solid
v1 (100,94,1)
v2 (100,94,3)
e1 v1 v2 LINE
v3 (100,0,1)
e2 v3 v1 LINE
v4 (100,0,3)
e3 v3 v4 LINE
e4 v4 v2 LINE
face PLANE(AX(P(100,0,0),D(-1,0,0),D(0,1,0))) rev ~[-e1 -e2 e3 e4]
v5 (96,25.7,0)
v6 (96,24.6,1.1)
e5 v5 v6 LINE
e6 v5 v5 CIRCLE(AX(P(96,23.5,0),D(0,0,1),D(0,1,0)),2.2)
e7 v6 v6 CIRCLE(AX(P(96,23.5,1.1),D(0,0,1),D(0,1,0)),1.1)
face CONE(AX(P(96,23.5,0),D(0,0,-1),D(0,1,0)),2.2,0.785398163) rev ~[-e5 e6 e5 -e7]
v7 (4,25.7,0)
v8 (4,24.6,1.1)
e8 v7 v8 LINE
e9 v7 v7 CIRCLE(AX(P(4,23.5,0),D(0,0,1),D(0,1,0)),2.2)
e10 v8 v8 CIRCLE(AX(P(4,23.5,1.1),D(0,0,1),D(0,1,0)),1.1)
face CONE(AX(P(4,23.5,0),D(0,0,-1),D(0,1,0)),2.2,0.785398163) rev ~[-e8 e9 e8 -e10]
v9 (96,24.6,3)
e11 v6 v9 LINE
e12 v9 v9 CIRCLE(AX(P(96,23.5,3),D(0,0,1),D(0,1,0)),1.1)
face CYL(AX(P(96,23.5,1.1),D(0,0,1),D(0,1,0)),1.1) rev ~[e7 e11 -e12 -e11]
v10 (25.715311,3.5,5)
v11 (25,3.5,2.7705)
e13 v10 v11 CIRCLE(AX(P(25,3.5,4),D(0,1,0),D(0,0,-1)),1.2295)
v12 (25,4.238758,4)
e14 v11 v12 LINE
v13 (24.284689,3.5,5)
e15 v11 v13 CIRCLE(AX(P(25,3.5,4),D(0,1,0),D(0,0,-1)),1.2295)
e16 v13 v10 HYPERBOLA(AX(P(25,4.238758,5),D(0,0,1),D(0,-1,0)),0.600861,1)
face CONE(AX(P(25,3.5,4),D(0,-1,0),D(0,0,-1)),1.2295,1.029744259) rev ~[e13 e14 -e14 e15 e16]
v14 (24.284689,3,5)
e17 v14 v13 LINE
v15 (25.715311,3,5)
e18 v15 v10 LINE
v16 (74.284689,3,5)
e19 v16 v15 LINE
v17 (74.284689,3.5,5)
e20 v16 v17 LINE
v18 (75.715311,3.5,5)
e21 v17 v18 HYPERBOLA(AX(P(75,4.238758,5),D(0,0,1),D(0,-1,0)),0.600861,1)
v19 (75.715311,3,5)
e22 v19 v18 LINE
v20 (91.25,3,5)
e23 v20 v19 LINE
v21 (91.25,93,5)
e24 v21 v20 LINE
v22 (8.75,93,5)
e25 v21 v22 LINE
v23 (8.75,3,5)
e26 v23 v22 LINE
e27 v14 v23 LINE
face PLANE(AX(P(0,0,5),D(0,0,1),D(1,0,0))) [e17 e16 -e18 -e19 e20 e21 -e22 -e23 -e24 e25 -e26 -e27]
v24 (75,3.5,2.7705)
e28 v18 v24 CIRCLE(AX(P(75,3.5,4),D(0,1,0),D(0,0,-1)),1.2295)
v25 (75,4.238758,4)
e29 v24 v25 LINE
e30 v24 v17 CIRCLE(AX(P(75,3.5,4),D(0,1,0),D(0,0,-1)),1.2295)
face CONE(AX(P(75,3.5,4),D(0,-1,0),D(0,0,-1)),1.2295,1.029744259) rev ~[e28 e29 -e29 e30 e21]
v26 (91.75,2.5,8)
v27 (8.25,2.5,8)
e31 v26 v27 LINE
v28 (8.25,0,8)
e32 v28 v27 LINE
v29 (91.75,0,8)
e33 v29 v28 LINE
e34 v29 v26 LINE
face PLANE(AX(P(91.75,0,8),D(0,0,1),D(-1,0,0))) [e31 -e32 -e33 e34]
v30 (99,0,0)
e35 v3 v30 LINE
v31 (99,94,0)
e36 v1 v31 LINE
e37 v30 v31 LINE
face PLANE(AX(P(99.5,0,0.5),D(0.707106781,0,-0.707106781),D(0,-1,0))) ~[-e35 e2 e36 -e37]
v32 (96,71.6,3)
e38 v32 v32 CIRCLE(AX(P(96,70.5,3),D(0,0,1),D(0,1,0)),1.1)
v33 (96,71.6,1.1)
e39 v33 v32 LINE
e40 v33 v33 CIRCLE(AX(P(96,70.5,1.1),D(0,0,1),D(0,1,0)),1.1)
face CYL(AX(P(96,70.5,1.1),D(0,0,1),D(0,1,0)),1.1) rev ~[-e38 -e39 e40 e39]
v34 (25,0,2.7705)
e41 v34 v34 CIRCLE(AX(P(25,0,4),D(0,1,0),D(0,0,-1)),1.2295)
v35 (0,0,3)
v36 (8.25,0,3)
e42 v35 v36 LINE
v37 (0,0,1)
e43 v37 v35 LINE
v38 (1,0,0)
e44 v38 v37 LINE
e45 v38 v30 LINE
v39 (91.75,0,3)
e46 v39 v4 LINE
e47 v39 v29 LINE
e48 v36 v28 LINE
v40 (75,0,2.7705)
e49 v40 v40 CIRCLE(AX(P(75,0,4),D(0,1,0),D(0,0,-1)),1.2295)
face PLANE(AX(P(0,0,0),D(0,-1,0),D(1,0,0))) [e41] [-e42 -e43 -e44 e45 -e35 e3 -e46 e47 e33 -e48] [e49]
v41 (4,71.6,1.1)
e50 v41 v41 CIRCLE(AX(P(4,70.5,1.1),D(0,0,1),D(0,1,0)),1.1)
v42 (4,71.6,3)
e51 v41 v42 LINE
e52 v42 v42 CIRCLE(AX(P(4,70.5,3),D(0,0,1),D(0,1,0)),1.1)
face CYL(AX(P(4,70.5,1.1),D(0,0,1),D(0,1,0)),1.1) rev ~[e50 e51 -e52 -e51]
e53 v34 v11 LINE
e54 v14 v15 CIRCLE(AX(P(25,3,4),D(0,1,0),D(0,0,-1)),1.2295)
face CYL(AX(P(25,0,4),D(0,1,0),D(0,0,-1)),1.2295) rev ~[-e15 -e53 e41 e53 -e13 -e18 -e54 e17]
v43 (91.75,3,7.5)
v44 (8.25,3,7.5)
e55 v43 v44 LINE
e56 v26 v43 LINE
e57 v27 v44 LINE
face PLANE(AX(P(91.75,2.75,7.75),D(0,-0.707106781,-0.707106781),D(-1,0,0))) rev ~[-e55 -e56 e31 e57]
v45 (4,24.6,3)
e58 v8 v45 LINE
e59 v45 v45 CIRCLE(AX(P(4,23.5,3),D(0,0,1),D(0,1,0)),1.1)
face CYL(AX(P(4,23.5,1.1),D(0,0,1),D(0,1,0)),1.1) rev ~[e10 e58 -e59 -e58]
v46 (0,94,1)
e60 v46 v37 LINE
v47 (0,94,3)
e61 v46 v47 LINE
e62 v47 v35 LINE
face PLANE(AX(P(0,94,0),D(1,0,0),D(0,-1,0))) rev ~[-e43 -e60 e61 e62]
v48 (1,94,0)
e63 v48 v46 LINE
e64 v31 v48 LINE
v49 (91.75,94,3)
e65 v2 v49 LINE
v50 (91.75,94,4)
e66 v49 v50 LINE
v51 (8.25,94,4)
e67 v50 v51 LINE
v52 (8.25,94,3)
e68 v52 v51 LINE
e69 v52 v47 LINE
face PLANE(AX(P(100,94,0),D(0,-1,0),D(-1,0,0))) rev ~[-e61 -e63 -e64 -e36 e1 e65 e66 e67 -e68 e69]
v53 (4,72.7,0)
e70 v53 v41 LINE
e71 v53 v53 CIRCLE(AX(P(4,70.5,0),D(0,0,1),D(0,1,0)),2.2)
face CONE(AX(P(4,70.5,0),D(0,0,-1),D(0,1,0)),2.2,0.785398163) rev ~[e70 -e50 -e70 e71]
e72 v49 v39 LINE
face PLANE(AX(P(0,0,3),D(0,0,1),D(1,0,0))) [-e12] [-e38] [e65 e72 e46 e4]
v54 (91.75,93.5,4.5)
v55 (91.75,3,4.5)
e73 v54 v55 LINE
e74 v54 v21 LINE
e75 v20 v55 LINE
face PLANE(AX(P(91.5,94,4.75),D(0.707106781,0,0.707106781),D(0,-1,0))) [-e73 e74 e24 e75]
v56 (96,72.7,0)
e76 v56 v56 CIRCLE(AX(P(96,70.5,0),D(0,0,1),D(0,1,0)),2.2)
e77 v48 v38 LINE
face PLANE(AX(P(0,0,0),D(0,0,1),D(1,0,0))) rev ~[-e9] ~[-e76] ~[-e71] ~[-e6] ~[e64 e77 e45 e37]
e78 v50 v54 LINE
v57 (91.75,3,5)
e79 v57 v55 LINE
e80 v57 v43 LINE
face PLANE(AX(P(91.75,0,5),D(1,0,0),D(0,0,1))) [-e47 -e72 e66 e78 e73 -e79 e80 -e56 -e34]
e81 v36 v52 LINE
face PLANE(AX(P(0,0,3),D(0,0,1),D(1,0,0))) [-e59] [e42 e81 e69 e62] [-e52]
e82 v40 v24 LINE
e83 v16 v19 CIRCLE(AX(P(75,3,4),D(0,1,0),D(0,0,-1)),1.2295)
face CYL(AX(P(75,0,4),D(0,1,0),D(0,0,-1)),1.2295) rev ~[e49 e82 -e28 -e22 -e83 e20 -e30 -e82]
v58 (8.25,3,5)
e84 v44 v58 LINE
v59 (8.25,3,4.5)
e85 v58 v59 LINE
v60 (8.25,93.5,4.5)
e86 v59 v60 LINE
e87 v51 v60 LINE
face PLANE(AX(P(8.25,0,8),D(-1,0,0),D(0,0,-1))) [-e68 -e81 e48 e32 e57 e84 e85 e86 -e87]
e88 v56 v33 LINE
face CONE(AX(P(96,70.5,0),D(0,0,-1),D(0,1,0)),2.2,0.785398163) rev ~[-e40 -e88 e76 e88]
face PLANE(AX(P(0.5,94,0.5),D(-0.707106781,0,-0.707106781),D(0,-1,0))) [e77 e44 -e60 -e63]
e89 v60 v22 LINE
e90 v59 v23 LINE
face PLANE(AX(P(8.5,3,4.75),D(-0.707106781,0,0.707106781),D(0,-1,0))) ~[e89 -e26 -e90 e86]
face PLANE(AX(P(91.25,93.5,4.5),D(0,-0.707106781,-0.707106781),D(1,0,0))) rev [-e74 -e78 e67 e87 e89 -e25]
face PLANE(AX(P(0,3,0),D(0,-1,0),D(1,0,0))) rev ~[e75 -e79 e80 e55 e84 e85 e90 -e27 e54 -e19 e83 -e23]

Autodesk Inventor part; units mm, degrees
ref_plane "YZ Plane" through (0, 0, 0) normal (1, 0, 0) x (0, 1, 0)
ref_plane "XZ Plane" through (0, 0, 0) normal (0, 1, 0) x (-1, 0, 0)
ref_plane "XY Plane" through (0, 0, 0) normal (0, 0, 1) x (1, 0, 0)
sketch "Sketch1" plane through (0, 0, 0) normal (0, 0, 1) x (1, 0, 0)
  line L0 (0, 0) -> (100, 0)
  line L1 (100, 0) -> (100, 94)
  line L2 (100, 94) -> (0, 94)
  line L3 (0, 94) -> (0, 0)
  dimension "d0" = 100
  dimension "d1" = 94
extrude "Extrusion1" add sketch "Sketch1" along normal blind 3
sketch "Sketch2" plane through (0, 0, 3) normal (0, 0, 1) x (1, 0, 0)
  line L0 (100, 94) -> (0, 94) projected
  line L1 (8.25, 94) -> (91.75, 94)
  line L2 (91.75, 94) -> (91.75, 0)
  line L3 (91.75, 0) -> (8.25, 0)
  line L4 (8.25, 0) -> (8.25, 94)
  line L5 (100, 0) -> (100, 94) construction
  line L6 (100, 94) -> (92, 94) construction
  line L7 (92, 94) -> (92, 0) construction
  line L8 (92, 0) -> (100, 0) construction
  line L9 (100, 0) -> (100, 94) construction
  line L10 (0, 94) -> (8, 94) construction
  line L11 (8, 94) -> (8, 0) construction
  line L12 (8, 0) -> (0, 0) construction
  line L13 (0, 0) -> (0, 94) construction
  line L14 (0, 0) -> (100, 0) construction
  dimension "d4" = 8
  dimension "d5" = 0.25
  dimension "d6" = 0.25
extrude "Extrusion2" add sketch "Sketch2" along normal blind 2
sketch "Sketch4" plane through (0, 0, 0) normal (0, -1, 0) x (1, 0, 0)
  line L0 (91.75, 5) -> (8.25, 5) projected
  line L1 (8.25, 5) -> (91.75, 5)
  line L2 (91.75, 5) -> (91.75, 8)
  line L3 (91.75, 8) -> (8.25, 8)
  line L4 (8.25, 8) -> (8.25, 5)
  line L5 (91.75, 3) -> (91.75, 5) projected
  line L6 (0, 0) -> (100, 0) projected
  dimension "d10" = 8
extrude "Extrusion3" add sketch "Sketch4" against normal blind 3
sketch "Sketch6" plane through (0, 0, 0) normal (0, -1, 0) x (1, 0, 0)
  line L0 (0, 0) -> (100, 0) projected
  line L1 (91.75, 8) -> (8.25, 8) projected
  line L2 (100, 0) -> (100, 3) projected
  point P0 (25, 4)
  point P1 (75, 4)
  dimension "d20" = 8
  dimension "d21" = 4
  dimension "d22" = 100
  dimension "d23" = 25
  dimension "d24" = 50
hole "Hole1" at (25, 0, 4) at (75, 0, 4) direction (0, 1, 0) diameter 2.459 depth 3.5 tip angle 118 thread size "M3x0.5" class "6H" standard "ANSI Metric M Profile"
sketch "Sketch7" plane through (0, 0, 0) normal (0, 0, -1) x (-1, 0, 0)
  line L0 (-91.75, 94) -> (-91.75, 0) projected
  line L1 (-8.25, 0) -> (-8.25, 94) projected
  line L2 (-100, 0) -> (-100, 94) projected
  line L3 (0, 94) -> (0, 0) projected
  line L4 (-100, 94) -> (0, 94) projected
  point P0 (-96, 70.5)
  point P1 (-4, 70.5)
  point P2 (-96, 23.5)
  point P3 (-4, 23.5)
  dimension "d32" = 8.25
  dimension "d33" = 4
  dimension "d34" = 4
  dimension "d35" = 94
  dimension "d36" = 23.5
  dimension "d39" = 47
hole "Hole2" at (96, 70.5, 0) at (4, 70.5, 0) at (96, 23.5, 0) at (4, 23.5, 0) direction (0, 0, 1) diameter 2.2 depth 3.5 tip angle 118 countersink diameter 4.4 countersink angle 90 clearance for "Flat Head Machine Screw" size "M2" standard "Ansi Metric M Profile"
chamfer "Chamfer2" distance 0.5 angle 45 3 edges at (8.25, 48.5, 5) (50, 3, 8) (91.75, 48.5, 5)
chamfer "Chamfer3" distance 1 angle 45 1 edges at (50, 94, 5)
chamfer "Chamfer4" distance 1 angle 45 2 edges at (100, 47, 0) (0, 47, 0)
equation "\"d6\" = d5"
equation "\"d21\" = 0.5 * d20"
equation "\"d23\" = 0.25 * d22"
equation "\"d24\" = 2 * d23"
equation "\"d34\" = d33"
equation "\"d36\" = 0.25 * d35"
equation "\"d39\" = 2 * d36"
properties part number "FrontPanel" material "Aluminum 6061"
